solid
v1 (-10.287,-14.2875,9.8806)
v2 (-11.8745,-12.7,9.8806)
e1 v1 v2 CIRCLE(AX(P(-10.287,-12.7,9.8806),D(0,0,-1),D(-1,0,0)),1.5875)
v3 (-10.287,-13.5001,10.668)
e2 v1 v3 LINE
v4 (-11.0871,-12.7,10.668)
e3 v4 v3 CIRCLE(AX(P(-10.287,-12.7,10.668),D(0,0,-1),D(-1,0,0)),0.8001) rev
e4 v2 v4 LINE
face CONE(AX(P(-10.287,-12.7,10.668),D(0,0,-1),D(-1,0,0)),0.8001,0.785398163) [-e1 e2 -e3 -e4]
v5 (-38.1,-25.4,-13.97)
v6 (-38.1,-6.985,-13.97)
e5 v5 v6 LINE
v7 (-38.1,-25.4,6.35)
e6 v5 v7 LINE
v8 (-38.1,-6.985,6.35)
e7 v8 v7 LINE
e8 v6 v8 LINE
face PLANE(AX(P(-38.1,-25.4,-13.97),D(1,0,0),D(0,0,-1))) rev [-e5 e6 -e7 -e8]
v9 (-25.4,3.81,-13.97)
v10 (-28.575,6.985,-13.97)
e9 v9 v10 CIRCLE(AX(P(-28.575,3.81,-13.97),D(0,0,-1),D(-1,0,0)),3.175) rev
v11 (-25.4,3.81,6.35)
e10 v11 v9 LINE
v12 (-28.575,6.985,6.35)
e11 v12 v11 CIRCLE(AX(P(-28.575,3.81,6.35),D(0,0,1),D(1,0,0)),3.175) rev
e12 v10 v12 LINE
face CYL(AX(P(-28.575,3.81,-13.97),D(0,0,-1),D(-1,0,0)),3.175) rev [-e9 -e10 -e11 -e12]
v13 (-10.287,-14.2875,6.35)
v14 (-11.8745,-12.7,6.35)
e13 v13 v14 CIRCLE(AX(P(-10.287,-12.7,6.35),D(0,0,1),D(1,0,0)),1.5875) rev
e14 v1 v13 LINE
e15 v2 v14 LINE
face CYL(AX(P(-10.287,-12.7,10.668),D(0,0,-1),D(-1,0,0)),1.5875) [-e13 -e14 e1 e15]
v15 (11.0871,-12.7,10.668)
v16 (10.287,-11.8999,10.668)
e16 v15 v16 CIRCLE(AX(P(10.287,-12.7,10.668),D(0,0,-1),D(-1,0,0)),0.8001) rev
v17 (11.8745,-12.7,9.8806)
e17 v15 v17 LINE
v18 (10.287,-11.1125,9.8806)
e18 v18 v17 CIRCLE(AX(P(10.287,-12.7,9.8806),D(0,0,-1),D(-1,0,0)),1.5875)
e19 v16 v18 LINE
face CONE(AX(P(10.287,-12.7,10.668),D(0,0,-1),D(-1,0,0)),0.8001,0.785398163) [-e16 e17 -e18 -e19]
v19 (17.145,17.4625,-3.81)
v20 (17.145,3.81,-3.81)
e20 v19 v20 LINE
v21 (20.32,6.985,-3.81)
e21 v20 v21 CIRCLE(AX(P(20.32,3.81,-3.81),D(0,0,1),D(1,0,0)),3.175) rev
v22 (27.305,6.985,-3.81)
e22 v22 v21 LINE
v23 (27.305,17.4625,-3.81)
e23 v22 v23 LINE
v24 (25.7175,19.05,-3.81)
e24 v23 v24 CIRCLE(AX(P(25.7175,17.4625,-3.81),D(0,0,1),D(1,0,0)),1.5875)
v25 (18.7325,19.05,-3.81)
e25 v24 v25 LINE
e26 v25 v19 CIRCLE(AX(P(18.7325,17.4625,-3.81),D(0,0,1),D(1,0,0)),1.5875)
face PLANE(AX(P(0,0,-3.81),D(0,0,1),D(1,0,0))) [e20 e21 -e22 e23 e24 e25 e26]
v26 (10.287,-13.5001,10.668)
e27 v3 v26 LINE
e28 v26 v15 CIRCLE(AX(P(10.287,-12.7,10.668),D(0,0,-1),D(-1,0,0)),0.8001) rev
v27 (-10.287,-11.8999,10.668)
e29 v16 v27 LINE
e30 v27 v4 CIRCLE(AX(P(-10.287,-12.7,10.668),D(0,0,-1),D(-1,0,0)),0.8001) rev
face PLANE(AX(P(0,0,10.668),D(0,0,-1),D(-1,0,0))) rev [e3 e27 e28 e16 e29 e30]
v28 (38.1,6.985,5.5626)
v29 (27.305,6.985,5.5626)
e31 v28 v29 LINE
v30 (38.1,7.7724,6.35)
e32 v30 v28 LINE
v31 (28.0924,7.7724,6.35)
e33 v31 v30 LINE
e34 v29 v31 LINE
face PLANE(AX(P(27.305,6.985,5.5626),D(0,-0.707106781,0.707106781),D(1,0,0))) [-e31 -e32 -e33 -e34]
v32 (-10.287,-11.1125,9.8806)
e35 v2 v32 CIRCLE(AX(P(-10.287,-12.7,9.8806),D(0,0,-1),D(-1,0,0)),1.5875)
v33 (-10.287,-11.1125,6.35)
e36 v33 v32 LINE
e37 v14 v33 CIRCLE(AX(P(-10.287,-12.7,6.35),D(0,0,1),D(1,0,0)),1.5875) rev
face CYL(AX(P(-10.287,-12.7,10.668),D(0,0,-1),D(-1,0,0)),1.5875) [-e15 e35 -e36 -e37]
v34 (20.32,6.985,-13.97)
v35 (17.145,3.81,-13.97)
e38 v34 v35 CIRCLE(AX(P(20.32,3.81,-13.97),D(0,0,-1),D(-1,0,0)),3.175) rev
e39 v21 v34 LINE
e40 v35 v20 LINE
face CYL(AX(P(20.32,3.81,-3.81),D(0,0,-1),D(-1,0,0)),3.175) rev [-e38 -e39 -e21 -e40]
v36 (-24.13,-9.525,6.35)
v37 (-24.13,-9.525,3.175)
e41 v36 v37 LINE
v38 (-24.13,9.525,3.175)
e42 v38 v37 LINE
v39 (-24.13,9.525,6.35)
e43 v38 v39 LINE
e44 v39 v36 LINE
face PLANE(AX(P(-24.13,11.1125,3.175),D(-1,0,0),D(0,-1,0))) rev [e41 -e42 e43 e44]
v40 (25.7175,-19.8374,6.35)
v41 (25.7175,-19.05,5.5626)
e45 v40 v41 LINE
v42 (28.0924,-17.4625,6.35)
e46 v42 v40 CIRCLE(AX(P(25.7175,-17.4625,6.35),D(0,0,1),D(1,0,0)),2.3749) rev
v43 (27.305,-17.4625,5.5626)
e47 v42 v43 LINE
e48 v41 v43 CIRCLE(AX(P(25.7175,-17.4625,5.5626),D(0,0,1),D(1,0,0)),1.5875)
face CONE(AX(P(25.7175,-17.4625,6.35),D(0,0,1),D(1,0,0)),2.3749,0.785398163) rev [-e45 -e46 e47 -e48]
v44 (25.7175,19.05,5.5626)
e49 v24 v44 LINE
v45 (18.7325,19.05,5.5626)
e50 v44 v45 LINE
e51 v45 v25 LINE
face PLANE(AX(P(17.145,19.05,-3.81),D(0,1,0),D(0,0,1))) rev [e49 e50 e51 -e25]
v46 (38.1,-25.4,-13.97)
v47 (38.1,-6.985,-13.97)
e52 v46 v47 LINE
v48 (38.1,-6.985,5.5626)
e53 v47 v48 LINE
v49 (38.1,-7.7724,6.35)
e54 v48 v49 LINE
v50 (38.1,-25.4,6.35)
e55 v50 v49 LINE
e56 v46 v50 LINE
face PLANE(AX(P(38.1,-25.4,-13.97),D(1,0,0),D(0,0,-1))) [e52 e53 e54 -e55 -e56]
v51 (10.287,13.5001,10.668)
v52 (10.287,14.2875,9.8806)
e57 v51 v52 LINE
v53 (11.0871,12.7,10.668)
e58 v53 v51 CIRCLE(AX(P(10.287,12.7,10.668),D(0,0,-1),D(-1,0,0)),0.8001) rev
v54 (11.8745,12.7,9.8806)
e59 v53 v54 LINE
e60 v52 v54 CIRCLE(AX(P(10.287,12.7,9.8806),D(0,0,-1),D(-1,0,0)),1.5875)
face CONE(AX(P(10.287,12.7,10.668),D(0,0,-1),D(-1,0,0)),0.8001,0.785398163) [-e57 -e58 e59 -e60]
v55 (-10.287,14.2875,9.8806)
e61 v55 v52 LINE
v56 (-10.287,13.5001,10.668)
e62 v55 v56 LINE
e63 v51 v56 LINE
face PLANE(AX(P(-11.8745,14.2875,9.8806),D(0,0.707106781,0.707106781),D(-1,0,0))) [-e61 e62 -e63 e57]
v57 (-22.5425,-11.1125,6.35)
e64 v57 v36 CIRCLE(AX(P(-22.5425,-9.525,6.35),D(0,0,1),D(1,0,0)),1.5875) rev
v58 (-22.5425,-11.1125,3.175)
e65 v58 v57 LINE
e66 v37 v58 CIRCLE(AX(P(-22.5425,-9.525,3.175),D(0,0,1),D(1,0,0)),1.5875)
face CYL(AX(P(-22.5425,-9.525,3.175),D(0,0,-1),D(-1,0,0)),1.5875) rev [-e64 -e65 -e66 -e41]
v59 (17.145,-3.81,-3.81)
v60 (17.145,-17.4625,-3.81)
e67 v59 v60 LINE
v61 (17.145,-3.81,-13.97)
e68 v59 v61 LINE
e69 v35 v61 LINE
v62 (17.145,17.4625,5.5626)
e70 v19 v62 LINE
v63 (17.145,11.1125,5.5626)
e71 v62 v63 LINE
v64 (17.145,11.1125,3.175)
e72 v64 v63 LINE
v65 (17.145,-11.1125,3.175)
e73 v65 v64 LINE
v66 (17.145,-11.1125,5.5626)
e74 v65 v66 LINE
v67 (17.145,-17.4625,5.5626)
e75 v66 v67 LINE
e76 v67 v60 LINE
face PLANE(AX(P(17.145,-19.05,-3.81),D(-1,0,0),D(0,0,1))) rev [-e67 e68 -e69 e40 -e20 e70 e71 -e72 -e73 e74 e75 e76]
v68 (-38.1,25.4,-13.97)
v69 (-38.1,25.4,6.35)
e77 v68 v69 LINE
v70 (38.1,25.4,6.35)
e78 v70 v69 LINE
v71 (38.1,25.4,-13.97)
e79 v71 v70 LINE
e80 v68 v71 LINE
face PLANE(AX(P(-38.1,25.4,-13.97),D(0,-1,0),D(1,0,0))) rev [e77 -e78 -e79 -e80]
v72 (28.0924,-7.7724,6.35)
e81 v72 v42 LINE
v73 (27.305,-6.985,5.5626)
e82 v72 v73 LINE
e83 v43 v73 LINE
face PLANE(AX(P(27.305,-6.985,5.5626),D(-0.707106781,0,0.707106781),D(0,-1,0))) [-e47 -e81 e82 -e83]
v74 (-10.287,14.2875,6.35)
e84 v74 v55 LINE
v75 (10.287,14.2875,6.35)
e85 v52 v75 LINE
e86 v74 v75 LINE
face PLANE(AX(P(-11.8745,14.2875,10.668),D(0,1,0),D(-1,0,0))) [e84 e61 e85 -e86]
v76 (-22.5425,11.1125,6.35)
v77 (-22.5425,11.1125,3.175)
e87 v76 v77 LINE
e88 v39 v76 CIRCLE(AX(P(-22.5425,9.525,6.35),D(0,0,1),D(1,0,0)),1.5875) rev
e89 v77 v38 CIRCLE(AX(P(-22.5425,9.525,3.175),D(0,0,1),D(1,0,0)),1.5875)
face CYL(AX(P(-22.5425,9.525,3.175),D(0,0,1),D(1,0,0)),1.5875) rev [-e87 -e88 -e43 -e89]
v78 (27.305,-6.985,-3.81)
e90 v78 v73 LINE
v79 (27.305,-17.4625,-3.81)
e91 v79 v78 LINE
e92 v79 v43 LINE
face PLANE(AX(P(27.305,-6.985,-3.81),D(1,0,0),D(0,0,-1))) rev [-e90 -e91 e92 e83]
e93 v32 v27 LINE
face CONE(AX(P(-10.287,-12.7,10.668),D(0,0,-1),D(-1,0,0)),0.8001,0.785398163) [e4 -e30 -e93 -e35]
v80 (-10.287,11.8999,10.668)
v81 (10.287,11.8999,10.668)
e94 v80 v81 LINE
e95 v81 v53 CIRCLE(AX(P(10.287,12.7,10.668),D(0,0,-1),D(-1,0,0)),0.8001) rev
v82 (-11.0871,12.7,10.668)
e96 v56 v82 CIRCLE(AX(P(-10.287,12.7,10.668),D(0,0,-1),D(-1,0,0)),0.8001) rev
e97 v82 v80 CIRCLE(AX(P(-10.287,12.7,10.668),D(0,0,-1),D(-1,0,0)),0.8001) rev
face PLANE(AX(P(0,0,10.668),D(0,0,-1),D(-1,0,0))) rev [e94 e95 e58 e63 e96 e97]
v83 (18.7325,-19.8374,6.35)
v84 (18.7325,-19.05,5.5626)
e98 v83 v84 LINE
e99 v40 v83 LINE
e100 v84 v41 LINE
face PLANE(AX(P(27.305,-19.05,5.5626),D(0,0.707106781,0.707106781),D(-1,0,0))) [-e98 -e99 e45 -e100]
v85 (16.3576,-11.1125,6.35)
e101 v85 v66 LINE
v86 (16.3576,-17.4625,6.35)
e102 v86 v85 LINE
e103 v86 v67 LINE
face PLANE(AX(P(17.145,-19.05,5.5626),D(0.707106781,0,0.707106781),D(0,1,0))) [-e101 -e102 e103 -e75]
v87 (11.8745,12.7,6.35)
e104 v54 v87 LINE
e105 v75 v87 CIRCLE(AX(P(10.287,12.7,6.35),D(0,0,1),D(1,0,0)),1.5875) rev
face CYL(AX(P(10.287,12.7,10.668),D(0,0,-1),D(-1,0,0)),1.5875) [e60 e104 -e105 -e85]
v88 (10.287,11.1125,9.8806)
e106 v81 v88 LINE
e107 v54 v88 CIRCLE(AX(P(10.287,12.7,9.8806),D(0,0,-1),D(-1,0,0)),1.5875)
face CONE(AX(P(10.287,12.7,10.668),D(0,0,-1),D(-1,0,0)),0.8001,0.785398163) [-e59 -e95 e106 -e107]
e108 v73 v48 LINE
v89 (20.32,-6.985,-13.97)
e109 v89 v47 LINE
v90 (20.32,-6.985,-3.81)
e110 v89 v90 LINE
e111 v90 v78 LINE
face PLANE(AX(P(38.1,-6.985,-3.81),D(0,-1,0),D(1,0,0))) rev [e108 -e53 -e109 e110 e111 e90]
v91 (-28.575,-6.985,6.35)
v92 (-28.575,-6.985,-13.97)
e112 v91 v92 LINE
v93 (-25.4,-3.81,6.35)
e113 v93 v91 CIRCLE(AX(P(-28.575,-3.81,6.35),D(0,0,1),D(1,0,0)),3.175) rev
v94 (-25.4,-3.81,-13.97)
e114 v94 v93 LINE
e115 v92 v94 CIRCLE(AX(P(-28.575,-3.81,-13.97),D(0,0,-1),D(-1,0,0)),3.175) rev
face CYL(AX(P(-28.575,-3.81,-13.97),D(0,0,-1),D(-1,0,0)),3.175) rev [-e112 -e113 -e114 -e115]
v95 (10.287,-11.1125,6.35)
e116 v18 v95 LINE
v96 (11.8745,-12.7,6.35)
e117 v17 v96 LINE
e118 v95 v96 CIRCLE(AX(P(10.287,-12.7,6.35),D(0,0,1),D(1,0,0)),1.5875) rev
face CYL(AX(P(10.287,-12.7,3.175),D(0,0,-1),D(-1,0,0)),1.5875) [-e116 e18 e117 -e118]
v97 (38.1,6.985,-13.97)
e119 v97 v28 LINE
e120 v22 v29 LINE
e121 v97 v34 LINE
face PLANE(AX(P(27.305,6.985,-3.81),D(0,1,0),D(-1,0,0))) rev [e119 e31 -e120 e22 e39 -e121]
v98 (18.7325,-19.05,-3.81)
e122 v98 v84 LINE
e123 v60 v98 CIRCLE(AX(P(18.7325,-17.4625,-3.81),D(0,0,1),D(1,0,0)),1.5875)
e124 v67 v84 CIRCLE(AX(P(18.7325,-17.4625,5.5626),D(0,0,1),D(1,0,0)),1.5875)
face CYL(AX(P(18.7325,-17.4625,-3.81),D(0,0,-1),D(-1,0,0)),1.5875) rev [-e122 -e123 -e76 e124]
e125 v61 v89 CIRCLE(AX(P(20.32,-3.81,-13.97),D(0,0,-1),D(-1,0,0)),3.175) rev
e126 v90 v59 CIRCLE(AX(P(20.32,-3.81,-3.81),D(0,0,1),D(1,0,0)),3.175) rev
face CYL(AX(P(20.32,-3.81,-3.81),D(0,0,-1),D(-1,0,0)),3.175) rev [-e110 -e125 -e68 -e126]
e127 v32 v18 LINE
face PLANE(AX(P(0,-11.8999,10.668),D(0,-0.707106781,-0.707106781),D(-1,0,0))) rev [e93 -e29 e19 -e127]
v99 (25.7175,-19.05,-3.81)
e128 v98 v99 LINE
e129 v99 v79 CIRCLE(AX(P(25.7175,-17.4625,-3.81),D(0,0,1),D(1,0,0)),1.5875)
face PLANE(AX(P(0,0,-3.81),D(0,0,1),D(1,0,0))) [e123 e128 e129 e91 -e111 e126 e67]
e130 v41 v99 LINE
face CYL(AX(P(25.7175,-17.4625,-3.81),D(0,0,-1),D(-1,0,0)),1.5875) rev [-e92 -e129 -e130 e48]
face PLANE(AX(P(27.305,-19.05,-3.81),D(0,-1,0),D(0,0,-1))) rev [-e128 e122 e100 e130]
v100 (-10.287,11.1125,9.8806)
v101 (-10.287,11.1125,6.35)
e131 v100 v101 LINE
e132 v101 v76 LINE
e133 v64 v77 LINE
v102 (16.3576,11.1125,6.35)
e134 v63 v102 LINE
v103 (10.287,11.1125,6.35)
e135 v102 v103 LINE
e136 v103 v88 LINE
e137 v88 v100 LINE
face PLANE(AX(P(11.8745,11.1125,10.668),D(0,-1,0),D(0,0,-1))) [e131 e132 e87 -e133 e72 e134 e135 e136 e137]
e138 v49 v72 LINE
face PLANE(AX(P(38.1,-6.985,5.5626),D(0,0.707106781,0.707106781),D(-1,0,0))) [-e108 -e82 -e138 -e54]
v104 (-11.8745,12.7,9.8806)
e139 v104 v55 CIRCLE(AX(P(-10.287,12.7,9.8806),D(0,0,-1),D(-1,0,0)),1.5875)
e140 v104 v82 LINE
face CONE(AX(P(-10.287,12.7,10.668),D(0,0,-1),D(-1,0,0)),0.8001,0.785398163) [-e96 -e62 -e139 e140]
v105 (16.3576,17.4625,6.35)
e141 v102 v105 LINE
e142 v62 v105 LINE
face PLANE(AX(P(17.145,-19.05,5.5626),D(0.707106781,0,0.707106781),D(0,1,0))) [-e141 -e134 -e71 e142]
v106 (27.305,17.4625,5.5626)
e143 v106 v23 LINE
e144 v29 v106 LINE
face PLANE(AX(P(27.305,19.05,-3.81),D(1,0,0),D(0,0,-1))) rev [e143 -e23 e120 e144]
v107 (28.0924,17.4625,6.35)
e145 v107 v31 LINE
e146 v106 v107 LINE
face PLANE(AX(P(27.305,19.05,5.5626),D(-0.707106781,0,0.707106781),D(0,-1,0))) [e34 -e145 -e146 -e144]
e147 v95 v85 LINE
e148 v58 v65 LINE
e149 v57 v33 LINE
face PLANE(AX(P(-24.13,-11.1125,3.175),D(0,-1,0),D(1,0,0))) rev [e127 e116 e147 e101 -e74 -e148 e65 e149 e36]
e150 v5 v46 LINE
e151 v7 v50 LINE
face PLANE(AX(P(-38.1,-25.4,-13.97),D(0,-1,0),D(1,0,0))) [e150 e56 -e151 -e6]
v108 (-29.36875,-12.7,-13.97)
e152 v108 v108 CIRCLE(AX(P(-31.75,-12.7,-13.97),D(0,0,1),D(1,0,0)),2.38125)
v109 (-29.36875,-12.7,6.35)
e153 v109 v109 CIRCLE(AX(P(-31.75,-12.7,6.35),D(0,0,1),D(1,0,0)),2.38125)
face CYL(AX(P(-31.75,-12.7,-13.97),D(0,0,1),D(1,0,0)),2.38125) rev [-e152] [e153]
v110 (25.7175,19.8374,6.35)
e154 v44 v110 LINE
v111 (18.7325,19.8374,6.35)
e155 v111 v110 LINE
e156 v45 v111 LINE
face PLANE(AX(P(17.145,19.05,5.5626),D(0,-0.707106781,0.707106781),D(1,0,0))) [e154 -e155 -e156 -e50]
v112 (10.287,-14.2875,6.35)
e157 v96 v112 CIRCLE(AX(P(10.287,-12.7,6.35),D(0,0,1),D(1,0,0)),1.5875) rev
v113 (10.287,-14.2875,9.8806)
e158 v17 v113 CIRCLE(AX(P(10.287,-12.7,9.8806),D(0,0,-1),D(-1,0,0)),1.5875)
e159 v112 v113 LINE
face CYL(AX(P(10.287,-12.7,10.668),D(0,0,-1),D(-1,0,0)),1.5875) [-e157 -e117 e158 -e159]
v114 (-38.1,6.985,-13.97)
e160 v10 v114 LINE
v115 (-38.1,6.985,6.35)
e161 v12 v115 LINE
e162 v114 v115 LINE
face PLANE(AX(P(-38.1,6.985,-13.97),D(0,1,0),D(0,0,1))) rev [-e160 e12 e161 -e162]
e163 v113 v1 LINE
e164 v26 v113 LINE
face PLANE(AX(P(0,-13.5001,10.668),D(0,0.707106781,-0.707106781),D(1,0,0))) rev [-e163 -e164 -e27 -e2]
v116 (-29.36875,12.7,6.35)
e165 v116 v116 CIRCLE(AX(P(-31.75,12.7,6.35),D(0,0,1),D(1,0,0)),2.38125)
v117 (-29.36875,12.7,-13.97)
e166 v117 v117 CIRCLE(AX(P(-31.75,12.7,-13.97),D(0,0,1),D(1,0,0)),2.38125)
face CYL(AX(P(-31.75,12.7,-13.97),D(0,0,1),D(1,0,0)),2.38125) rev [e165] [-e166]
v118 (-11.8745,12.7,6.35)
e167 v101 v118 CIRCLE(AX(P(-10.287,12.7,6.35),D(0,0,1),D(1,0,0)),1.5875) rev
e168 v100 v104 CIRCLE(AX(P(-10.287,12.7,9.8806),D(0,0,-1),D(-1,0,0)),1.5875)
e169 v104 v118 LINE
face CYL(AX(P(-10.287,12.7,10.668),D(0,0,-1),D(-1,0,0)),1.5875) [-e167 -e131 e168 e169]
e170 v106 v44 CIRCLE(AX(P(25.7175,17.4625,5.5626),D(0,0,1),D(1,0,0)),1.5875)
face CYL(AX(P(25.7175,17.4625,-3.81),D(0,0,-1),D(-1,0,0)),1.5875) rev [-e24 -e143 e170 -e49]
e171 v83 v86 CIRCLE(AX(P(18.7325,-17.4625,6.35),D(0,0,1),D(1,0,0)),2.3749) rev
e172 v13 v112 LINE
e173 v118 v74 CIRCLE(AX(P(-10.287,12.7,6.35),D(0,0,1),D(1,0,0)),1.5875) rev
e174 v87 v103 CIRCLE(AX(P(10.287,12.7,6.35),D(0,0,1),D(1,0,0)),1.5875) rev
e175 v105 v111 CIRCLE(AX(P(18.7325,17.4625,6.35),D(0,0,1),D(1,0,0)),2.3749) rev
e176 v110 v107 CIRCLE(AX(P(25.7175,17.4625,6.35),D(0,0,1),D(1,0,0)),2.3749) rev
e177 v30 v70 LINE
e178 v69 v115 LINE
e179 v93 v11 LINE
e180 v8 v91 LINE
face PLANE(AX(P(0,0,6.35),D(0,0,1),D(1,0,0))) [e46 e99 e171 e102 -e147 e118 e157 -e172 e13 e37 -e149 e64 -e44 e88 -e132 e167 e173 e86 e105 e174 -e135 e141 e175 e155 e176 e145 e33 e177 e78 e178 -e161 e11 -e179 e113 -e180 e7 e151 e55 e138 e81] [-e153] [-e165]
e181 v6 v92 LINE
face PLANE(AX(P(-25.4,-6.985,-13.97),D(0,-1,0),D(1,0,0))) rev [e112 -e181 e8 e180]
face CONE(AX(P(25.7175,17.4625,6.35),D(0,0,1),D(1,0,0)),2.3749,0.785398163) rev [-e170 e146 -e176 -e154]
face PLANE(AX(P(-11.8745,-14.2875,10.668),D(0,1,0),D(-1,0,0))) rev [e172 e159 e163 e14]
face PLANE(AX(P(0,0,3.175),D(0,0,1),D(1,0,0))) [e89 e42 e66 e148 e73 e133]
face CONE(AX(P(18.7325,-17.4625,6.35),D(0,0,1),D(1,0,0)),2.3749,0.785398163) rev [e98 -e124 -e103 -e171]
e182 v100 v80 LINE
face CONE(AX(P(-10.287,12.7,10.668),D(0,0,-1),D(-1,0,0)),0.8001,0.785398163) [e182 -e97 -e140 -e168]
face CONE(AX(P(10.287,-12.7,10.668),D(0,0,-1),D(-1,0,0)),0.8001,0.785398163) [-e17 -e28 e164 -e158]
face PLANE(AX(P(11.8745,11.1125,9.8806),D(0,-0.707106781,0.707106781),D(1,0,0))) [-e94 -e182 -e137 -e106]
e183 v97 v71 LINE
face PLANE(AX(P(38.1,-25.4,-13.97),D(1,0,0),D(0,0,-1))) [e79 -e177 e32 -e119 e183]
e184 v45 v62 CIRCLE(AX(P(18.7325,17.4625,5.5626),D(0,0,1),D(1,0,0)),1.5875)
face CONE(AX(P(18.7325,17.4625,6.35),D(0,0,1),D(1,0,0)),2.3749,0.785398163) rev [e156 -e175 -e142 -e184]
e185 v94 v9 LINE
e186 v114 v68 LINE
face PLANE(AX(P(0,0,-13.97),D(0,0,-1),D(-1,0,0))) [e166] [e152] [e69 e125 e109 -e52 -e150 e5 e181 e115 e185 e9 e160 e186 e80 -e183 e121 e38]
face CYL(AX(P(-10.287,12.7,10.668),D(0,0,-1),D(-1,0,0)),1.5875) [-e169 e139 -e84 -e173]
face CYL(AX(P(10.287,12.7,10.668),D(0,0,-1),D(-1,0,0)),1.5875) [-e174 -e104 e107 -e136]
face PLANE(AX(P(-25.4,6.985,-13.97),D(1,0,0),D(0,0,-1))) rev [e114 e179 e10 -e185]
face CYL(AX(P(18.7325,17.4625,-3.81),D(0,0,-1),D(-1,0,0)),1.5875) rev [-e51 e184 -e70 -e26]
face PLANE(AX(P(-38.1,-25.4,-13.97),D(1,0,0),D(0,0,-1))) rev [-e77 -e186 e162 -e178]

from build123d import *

# Parameters (mm, degrees)
SKETCH1_W           = 50.8
SKETCH1_H           = 76.2
BOSS_EXTRUDE1_DEPTH = 13.97
SKETCH2_W           = 76.2
SKETCH2_H           = 50.8
BOSS_EXTRUDE2_DEPTH = 6.35
CUT_EXTRUDE1_DEPTH  = 10.16
SKETCH4_W           = 12.7
SKETCH4_H           = 13.97
SKETCH4_W_2         = 20.955
CUT_EXTRUDE2_DEPTH  = 51.096630625
SKETCH8_R           = 2.38125
CUT_EXTRUDE4_DEPTH  = 51.096630625
SKETCH10_W          = 23.749
SKETCH10_H          = 3.175
BOSS_EXTRUDE4_DEPTH = 4.318
SKETCH11_W          = 41.275
SKETCH11_H          = 22.225
CUT_EXTRUDE5_DEPTH  = 3.175
FILLET2_R           = 3.175
FILLET3_R           = 1.5875
CHAMFER3_SIZE       = 0.7874


with BuildPart() as part:
    # Sketch1 → Boss-Extrude1 (new body)
    with BuildSketch(Plane(origin=(0, 0, 0), x_dir=(0, 1, 0), z_dir=(0, 0, 1))):
        Rectangle(SKETCH1_W, SKETCH1_H)
    extrude(amount=-BOSS_EXTRUDE1_DEPTH)

    # Sketch2 → Boss-Extrude2 (add)
    with BuildSketch(Plane.XY):
        Rectangle(SKETCH2_W, SKETCH2_H)
    extrude(amount=BOSS_EXTRUDE2_DEPTH)

    # Sketch3 → Cut-Extrude1 (cut)
    with BuildSketch(Plane.XY.offset(6.35)):
        Polygon((38.1, 6.985), (38.1, -6.985), (27.305, -6.985), (27.305, -19.05), (17.145, -19.05), (17.145, 19.05), (27.305, 19.05), (27.305, 6.985), align=None)
    extrude(amount=-CUT_EXTRUDE1_DEPTH, mode=Mode.SUBTRACT)

    # Sketch4 → Cut-Extrude2 (cut, through all)
    with BuildSketch(Plane.XY.offset(6.35)):
        with Locations((-31.75, 0)):
            Rectangle(SKETCH4_W, SKETCH4_H)
        with Locations((27.6225, 0)):
            Rectangle(SKETCH4_W_2, SKETCH4_H)
    extrude(amount=-CUT_EXTRUDE2_DEPTH, mode=Mode.SUBTRACT)

    # Sketch8 → Cut-Extrude4 (cut, through all)
    with BuildSketch(Plane.XY.offset(6.35)):
        with Locations((-31.75, 12.7)):
            Circle(SKETCH8_R)
        with Locations((-31.75, -12.7)):
            Circle(SKETCH8_R)
    extrude(amount=-CUT_EXTRUDE4_DEPTH, mode=Mode.SUBTRACT)

    # Sketch10 → Boss-Extrude4 (add)
    with BuildSketch(Plane.XY.offset(6.35)):
        with Locations((0, 12.7)):
            Rectangle(SKETCH10_W, SKETCH10_H)
    boss_extrude4 = extrude(amount=BOSS_EXTRUDE4_DEPTH)

    # Sketch11 → Cut-Extrude5 (cut)
    with BuildSketch(Plane.XY.offset(6.35)):
        with Locations((-3.4925, 0)):
            Rectangle(SKETCH11_W, SKETCH11_H)
    extrude(amount=-CUT_EXTRUDE5_DEPTH, mode=Mode.SUBTRACT)

    # Mirror1: Boss-Extrude4 across plane
    add(boss_extrude4.mirror(Plane.ZX))

    # Fillet2
    fillet2_edges = [part.edges().sort_by_distance(p)[0] for p in [
        (-25.4, 6.985, -3.81),
        (-25.4, -6.985, -3.81),
        (17.145, -6.985, -8.89),
        (17.145, 6.985, -8.89),
    ]]
    fillet(fillet2_edges, radius=FILLET2_R)

    # Fillet3
    fillet3_edges = [part.edges().sort_by_distance(p)[0] for p in [
        (-24.13, -11.1125, 4.7625),
        (-24.13, 11.1125, 4.7625),
        (17.145, -19.05, 1.27),
        (27.305, -19.05, 1.27),
        (11.8745, 14.2875, 8.509),
        (11.8745, -11.1125, 8.509),
        (11.8745, -14.2875, 8.509),
        (11.8745, 11.1125, 8.509),
        (17.145, 19.05, 1.27),
        (-11.8745, -14.2875, 8.509),
        (-11.8745, -11.1125, 8.509),
        (-11.8745, 11.1125, 8.509),
        (-11.8745, 14.2875, 8.509),
        (27.305, 19.05, 1.27),
    ]]
    fillet(fillet3_edges, radius=FILLET3_R - 0.0001)  # a hair under: the kernel refuses the full size

    # Chamfer3
    chamfer3_edges = [part.edges().sort_by_distance(p)[0] for p in [
        (17.145, -14.28755, 6.35),
        (0, -11.1125, 10.668),
        (0, 11.1125, 10.668),
        (22.225, -19.05, 6.35),
        (17.145, 14.28755, 6.35),
        (27.305, -12.2238, 6.35),
        (0, 14.2875, 10.668),
        (-11.409561304, 13.822561304, 10.668),
        (-11.409561304, 11.577438696, 10.668),
        (11.409561304, 11.577438696, 10.668),
        (11.409561304, 13.822561304, 10.668),
        (0, -14.2875, 10.668),
        (-11.409561304, -11.577438696, 10.668),
        (-11.409561304, -13.822561304, 10.668),
        (11.409561304, -13.822561304, 10.668),
        (11.409561304, -11.577438696, 10.668),
        (22.225, 19.05, 6.35),
        (17.609938696, -18.585061304, 6.35),
        (26.840061304, -18.585061304, 6.35),
        (17.609938696, 18.585061304, 6.35),
        (26.840061304, 18.585061304, 6.35),
        (32.7025, -6.985, 6.35),
        (32.7025, 6.985, 6.35),
        (27.305, 12.2238, 6.35),
    ]]
    chamfer(chamfer3_edges, length=CHAMFER3_SIZE)


solid = part.part
